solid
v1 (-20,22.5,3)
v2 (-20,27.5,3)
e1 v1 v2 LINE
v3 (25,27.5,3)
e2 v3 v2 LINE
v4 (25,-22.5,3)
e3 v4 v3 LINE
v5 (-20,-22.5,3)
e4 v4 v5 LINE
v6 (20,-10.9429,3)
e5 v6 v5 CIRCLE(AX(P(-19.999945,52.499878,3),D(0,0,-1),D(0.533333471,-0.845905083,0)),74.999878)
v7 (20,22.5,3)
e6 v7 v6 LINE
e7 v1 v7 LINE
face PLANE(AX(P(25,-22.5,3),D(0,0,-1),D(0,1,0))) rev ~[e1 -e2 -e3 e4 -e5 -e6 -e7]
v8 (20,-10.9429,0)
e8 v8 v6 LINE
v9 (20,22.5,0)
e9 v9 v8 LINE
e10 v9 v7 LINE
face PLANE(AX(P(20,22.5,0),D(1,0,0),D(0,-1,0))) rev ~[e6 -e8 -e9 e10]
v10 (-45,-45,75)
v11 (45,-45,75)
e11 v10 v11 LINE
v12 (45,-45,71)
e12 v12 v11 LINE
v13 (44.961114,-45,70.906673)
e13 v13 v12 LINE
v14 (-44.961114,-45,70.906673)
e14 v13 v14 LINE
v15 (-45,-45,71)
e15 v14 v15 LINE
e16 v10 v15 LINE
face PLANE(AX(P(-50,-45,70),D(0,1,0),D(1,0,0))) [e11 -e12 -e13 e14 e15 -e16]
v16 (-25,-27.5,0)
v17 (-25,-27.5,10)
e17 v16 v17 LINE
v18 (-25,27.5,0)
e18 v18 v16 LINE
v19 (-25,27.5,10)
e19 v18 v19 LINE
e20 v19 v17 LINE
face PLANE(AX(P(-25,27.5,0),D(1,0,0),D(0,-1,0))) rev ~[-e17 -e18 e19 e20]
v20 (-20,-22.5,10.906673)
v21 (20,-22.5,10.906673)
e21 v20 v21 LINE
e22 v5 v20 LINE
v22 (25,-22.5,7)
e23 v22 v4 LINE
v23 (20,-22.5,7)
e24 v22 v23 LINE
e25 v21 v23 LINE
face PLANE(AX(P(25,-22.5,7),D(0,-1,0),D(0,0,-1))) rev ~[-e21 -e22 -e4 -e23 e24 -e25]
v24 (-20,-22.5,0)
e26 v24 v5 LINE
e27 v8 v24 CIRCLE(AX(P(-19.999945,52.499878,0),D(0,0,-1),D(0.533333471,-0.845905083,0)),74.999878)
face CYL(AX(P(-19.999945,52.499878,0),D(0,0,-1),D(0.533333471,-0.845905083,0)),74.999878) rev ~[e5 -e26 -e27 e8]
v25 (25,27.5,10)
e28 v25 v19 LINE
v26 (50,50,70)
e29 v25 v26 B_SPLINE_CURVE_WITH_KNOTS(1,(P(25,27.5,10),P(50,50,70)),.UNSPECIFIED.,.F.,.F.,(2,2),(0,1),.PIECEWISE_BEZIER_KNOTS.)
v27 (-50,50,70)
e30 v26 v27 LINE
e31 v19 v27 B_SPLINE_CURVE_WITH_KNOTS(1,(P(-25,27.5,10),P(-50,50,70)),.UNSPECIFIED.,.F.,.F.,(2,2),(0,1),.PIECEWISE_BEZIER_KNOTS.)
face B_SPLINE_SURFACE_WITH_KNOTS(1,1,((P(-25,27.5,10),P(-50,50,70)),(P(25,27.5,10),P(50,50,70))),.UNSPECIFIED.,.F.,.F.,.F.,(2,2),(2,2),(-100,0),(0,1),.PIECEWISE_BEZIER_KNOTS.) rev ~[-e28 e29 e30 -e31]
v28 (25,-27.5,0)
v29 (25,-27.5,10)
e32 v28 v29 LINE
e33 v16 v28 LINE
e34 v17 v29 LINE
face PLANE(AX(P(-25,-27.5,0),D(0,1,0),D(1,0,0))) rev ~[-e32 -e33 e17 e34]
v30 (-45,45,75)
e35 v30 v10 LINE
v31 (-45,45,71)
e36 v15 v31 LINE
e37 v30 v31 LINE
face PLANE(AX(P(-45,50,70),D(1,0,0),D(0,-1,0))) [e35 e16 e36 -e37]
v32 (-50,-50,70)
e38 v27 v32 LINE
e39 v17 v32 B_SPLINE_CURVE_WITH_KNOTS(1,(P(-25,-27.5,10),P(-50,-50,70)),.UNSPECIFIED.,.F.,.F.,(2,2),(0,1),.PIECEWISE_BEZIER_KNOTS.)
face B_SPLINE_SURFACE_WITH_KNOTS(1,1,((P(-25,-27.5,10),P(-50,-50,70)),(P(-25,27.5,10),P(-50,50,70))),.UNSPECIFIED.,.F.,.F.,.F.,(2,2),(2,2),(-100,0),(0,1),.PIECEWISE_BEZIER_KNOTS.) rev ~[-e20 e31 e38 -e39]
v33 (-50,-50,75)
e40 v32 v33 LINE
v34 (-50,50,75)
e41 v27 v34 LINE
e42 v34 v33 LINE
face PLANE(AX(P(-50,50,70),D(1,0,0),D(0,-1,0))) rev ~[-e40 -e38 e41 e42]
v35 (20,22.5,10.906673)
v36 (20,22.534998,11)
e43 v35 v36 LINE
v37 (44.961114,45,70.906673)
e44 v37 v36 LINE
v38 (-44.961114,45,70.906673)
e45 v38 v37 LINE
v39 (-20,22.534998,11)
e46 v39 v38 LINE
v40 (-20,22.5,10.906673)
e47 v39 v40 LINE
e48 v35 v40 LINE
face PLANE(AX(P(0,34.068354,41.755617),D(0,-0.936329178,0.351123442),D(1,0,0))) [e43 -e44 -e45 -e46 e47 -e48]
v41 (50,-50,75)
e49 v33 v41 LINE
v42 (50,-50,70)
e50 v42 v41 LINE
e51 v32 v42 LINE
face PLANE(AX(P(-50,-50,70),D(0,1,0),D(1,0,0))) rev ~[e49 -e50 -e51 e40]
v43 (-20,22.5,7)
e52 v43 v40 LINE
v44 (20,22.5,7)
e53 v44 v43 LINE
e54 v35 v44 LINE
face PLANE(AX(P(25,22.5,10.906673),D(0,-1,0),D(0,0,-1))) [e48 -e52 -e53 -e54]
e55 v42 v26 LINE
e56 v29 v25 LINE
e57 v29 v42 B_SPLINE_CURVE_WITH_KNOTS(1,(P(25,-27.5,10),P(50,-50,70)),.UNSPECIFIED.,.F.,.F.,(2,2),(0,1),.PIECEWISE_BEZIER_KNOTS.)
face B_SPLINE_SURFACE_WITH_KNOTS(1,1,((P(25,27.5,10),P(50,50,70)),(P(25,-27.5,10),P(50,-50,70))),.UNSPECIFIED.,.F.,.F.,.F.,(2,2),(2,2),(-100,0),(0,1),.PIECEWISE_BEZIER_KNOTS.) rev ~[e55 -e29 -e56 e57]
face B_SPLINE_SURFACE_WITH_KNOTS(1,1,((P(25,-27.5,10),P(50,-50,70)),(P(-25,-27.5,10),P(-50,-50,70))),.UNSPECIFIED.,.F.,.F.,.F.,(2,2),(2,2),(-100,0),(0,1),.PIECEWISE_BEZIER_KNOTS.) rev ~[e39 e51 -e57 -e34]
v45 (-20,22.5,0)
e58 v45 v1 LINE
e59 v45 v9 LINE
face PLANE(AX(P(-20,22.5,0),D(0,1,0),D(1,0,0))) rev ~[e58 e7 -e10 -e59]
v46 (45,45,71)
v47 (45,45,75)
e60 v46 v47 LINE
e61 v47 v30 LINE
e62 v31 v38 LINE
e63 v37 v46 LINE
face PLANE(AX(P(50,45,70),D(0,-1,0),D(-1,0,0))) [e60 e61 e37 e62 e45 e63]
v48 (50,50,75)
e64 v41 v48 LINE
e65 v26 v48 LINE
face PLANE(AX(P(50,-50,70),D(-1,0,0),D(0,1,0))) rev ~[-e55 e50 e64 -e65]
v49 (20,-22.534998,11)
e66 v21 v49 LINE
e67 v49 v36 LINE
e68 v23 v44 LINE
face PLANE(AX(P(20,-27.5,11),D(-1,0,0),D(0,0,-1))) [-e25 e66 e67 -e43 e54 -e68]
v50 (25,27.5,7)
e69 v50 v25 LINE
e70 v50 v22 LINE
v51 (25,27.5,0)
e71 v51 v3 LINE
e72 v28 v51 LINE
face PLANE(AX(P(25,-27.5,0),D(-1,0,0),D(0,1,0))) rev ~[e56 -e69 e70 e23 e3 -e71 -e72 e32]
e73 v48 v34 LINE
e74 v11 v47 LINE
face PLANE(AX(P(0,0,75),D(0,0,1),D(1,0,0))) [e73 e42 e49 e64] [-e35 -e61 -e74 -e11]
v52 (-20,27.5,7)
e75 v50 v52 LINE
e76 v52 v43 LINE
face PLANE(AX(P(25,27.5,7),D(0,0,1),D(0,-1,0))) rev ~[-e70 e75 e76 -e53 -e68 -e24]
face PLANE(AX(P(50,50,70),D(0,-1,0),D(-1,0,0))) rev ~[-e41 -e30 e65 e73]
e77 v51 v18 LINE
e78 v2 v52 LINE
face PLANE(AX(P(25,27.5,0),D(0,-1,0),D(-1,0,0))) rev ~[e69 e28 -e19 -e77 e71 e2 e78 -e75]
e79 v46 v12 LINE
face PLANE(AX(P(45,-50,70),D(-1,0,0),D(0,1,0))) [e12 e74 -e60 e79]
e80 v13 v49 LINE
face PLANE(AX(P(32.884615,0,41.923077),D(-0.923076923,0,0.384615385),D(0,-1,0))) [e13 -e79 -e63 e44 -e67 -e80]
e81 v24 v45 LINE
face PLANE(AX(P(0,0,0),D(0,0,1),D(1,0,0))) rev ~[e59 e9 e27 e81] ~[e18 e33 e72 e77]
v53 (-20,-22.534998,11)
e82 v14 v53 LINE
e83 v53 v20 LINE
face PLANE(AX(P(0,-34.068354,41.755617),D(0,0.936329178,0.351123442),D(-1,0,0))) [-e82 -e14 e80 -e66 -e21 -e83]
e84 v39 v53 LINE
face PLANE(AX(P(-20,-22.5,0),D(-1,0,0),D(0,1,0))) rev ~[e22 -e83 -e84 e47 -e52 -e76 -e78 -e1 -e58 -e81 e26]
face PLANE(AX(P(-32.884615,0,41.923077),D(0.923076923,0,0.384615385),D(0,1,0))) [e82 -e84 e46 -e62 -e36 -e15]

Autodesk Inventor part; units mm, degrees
ref_plane "YZ Plane" through (0, 0, 0) normal (1, 0, 0) x (0, 1, 0)
ref_plane "XZ Plane" through (0, 0, 0) normal (0, 1, 0) x (-1, 0, 0)
sketch "Sketch1" plane through (0, 0, 0) normal (0, 0, 1) x (1, 0, 0)
  line L0 (-25, -27.5) -> (25, -27.5)
  line L1 (25, -27.5) -> (25, 27.5)
  line L2 (25, 27.5) -> (-25, 27.5)
  line L3 (-25, 27.5) -> (-25, -27.5)
  line L4 (-25, -27.5) -> (25, 27.5) construction
  line L5 (25, -27.5) -> (-25, 27.5) construction
  point P0 (0, 0)
  dimension "d0" = 50
  dimension "d1" = 55
extrude "Extrusion1" add sketch "Sketch1" along normal blind 10
ref_plane "Work Plane1" through (0, 0, 70) normal (0, 0, 1) x (1, 0, 0)
sketch "Sketch3" plane through (0, 0, 70) normal (0, 0, 1) x (1, 0, 0)
  line L0 (-50, -50) -> (50, -50)
  line L1 (50, -50) -> (50, 50)
  line L2 (50, 50) -> (-50, 50)
  line L3 (-50, 50) -> (-50, -50)
  line L4 (-50, -50) -> (50, 50) construction
  line L5 (50, -50) -> (-50, 50) construction
  line L6 (-42.5, -42.5) -> (42.5, 42.5) construction
  line L7 (42.5, -42.5) -> (-42.5, 42.5) construction
  point P0 (0, 0)
  dimension "d9" = 100
  dimension "d10" = 100
extrude "Extrusion3" add sketch "Sketch3" along normal blind 5
loft "Loft1" add section 1 edges at (0, -27.5, 10) (25, 0, 10) (0, 27.5, 10) (-25, 0, 10) section 2 edges at (0, -50, 70) (-50, 0, 70) (0, 50, 70) (50, 0, 70)
shell "Shell2" thickness 5 removed faces 1 at (-16.6667, 16.6667, 75)
sketch "Sketch4" plane through (25, -27.5, 0) normal (1, 0, 0) x (0, 0, -1)
  line L0 (0, 55) -> (-10, 55) projected
  line L1 (0, 0) -> (-10, 0) projected
  line L2 (-3, 55) -> (-7, 55)
  line L3 (-7, 55) -> (-7, 5)
  line L4 (-7, 5) -> (-3, 5)
  line L5 (-3, 5) -> (-3, 55)
  point P0 (0, 27.5)
  dimension "d28" = 4
  dimension "d29" = 3
  dimension "d30" = 5
extrude "Extrusion4" cut sketch "Sketch4" against normal up to surface (45 mm away)
sketch "Sketch5" plane through (0, 0, 0) normal (0, 0, -1) x (-1, 0, 0)
  line L0 (-20, 22.5) -> (20, 22.5) construction
  line L1 (20, 22.5) -> (-20, 22.5) projected
  line L2 (20, -22.5) -> (20, 52.5) construction
  arc A0 (-20, -10.9429) -> (20, -22.5) centre (20, 52.5) ccw
  line L3 (20, -22.5) -> (20, 22.5)
  line L4 (-20, 22.5) -> (-20, -22.5) projected
  line L5 (-20, 22.5) -> (-20, -22.5) projected
  line L6 (-20, -22.5) -> (-20, -22.535) projected
  line L7 (-20, -22.535) -> (-20, 22.535) projected
  line L8 (-20, 22.5) -> (-20, 22.535) projected
  line L9 (-20, -10.9429) -> (-20, 22.5)
  line L10 (20, 22.5) -> (-20, 22.5)
  point P0 (0, 0)
  dimension "d31" = 75
extrude "Extrusion5" cut sketch "Sketch5" against normal through all
properties part number "funnel_"
